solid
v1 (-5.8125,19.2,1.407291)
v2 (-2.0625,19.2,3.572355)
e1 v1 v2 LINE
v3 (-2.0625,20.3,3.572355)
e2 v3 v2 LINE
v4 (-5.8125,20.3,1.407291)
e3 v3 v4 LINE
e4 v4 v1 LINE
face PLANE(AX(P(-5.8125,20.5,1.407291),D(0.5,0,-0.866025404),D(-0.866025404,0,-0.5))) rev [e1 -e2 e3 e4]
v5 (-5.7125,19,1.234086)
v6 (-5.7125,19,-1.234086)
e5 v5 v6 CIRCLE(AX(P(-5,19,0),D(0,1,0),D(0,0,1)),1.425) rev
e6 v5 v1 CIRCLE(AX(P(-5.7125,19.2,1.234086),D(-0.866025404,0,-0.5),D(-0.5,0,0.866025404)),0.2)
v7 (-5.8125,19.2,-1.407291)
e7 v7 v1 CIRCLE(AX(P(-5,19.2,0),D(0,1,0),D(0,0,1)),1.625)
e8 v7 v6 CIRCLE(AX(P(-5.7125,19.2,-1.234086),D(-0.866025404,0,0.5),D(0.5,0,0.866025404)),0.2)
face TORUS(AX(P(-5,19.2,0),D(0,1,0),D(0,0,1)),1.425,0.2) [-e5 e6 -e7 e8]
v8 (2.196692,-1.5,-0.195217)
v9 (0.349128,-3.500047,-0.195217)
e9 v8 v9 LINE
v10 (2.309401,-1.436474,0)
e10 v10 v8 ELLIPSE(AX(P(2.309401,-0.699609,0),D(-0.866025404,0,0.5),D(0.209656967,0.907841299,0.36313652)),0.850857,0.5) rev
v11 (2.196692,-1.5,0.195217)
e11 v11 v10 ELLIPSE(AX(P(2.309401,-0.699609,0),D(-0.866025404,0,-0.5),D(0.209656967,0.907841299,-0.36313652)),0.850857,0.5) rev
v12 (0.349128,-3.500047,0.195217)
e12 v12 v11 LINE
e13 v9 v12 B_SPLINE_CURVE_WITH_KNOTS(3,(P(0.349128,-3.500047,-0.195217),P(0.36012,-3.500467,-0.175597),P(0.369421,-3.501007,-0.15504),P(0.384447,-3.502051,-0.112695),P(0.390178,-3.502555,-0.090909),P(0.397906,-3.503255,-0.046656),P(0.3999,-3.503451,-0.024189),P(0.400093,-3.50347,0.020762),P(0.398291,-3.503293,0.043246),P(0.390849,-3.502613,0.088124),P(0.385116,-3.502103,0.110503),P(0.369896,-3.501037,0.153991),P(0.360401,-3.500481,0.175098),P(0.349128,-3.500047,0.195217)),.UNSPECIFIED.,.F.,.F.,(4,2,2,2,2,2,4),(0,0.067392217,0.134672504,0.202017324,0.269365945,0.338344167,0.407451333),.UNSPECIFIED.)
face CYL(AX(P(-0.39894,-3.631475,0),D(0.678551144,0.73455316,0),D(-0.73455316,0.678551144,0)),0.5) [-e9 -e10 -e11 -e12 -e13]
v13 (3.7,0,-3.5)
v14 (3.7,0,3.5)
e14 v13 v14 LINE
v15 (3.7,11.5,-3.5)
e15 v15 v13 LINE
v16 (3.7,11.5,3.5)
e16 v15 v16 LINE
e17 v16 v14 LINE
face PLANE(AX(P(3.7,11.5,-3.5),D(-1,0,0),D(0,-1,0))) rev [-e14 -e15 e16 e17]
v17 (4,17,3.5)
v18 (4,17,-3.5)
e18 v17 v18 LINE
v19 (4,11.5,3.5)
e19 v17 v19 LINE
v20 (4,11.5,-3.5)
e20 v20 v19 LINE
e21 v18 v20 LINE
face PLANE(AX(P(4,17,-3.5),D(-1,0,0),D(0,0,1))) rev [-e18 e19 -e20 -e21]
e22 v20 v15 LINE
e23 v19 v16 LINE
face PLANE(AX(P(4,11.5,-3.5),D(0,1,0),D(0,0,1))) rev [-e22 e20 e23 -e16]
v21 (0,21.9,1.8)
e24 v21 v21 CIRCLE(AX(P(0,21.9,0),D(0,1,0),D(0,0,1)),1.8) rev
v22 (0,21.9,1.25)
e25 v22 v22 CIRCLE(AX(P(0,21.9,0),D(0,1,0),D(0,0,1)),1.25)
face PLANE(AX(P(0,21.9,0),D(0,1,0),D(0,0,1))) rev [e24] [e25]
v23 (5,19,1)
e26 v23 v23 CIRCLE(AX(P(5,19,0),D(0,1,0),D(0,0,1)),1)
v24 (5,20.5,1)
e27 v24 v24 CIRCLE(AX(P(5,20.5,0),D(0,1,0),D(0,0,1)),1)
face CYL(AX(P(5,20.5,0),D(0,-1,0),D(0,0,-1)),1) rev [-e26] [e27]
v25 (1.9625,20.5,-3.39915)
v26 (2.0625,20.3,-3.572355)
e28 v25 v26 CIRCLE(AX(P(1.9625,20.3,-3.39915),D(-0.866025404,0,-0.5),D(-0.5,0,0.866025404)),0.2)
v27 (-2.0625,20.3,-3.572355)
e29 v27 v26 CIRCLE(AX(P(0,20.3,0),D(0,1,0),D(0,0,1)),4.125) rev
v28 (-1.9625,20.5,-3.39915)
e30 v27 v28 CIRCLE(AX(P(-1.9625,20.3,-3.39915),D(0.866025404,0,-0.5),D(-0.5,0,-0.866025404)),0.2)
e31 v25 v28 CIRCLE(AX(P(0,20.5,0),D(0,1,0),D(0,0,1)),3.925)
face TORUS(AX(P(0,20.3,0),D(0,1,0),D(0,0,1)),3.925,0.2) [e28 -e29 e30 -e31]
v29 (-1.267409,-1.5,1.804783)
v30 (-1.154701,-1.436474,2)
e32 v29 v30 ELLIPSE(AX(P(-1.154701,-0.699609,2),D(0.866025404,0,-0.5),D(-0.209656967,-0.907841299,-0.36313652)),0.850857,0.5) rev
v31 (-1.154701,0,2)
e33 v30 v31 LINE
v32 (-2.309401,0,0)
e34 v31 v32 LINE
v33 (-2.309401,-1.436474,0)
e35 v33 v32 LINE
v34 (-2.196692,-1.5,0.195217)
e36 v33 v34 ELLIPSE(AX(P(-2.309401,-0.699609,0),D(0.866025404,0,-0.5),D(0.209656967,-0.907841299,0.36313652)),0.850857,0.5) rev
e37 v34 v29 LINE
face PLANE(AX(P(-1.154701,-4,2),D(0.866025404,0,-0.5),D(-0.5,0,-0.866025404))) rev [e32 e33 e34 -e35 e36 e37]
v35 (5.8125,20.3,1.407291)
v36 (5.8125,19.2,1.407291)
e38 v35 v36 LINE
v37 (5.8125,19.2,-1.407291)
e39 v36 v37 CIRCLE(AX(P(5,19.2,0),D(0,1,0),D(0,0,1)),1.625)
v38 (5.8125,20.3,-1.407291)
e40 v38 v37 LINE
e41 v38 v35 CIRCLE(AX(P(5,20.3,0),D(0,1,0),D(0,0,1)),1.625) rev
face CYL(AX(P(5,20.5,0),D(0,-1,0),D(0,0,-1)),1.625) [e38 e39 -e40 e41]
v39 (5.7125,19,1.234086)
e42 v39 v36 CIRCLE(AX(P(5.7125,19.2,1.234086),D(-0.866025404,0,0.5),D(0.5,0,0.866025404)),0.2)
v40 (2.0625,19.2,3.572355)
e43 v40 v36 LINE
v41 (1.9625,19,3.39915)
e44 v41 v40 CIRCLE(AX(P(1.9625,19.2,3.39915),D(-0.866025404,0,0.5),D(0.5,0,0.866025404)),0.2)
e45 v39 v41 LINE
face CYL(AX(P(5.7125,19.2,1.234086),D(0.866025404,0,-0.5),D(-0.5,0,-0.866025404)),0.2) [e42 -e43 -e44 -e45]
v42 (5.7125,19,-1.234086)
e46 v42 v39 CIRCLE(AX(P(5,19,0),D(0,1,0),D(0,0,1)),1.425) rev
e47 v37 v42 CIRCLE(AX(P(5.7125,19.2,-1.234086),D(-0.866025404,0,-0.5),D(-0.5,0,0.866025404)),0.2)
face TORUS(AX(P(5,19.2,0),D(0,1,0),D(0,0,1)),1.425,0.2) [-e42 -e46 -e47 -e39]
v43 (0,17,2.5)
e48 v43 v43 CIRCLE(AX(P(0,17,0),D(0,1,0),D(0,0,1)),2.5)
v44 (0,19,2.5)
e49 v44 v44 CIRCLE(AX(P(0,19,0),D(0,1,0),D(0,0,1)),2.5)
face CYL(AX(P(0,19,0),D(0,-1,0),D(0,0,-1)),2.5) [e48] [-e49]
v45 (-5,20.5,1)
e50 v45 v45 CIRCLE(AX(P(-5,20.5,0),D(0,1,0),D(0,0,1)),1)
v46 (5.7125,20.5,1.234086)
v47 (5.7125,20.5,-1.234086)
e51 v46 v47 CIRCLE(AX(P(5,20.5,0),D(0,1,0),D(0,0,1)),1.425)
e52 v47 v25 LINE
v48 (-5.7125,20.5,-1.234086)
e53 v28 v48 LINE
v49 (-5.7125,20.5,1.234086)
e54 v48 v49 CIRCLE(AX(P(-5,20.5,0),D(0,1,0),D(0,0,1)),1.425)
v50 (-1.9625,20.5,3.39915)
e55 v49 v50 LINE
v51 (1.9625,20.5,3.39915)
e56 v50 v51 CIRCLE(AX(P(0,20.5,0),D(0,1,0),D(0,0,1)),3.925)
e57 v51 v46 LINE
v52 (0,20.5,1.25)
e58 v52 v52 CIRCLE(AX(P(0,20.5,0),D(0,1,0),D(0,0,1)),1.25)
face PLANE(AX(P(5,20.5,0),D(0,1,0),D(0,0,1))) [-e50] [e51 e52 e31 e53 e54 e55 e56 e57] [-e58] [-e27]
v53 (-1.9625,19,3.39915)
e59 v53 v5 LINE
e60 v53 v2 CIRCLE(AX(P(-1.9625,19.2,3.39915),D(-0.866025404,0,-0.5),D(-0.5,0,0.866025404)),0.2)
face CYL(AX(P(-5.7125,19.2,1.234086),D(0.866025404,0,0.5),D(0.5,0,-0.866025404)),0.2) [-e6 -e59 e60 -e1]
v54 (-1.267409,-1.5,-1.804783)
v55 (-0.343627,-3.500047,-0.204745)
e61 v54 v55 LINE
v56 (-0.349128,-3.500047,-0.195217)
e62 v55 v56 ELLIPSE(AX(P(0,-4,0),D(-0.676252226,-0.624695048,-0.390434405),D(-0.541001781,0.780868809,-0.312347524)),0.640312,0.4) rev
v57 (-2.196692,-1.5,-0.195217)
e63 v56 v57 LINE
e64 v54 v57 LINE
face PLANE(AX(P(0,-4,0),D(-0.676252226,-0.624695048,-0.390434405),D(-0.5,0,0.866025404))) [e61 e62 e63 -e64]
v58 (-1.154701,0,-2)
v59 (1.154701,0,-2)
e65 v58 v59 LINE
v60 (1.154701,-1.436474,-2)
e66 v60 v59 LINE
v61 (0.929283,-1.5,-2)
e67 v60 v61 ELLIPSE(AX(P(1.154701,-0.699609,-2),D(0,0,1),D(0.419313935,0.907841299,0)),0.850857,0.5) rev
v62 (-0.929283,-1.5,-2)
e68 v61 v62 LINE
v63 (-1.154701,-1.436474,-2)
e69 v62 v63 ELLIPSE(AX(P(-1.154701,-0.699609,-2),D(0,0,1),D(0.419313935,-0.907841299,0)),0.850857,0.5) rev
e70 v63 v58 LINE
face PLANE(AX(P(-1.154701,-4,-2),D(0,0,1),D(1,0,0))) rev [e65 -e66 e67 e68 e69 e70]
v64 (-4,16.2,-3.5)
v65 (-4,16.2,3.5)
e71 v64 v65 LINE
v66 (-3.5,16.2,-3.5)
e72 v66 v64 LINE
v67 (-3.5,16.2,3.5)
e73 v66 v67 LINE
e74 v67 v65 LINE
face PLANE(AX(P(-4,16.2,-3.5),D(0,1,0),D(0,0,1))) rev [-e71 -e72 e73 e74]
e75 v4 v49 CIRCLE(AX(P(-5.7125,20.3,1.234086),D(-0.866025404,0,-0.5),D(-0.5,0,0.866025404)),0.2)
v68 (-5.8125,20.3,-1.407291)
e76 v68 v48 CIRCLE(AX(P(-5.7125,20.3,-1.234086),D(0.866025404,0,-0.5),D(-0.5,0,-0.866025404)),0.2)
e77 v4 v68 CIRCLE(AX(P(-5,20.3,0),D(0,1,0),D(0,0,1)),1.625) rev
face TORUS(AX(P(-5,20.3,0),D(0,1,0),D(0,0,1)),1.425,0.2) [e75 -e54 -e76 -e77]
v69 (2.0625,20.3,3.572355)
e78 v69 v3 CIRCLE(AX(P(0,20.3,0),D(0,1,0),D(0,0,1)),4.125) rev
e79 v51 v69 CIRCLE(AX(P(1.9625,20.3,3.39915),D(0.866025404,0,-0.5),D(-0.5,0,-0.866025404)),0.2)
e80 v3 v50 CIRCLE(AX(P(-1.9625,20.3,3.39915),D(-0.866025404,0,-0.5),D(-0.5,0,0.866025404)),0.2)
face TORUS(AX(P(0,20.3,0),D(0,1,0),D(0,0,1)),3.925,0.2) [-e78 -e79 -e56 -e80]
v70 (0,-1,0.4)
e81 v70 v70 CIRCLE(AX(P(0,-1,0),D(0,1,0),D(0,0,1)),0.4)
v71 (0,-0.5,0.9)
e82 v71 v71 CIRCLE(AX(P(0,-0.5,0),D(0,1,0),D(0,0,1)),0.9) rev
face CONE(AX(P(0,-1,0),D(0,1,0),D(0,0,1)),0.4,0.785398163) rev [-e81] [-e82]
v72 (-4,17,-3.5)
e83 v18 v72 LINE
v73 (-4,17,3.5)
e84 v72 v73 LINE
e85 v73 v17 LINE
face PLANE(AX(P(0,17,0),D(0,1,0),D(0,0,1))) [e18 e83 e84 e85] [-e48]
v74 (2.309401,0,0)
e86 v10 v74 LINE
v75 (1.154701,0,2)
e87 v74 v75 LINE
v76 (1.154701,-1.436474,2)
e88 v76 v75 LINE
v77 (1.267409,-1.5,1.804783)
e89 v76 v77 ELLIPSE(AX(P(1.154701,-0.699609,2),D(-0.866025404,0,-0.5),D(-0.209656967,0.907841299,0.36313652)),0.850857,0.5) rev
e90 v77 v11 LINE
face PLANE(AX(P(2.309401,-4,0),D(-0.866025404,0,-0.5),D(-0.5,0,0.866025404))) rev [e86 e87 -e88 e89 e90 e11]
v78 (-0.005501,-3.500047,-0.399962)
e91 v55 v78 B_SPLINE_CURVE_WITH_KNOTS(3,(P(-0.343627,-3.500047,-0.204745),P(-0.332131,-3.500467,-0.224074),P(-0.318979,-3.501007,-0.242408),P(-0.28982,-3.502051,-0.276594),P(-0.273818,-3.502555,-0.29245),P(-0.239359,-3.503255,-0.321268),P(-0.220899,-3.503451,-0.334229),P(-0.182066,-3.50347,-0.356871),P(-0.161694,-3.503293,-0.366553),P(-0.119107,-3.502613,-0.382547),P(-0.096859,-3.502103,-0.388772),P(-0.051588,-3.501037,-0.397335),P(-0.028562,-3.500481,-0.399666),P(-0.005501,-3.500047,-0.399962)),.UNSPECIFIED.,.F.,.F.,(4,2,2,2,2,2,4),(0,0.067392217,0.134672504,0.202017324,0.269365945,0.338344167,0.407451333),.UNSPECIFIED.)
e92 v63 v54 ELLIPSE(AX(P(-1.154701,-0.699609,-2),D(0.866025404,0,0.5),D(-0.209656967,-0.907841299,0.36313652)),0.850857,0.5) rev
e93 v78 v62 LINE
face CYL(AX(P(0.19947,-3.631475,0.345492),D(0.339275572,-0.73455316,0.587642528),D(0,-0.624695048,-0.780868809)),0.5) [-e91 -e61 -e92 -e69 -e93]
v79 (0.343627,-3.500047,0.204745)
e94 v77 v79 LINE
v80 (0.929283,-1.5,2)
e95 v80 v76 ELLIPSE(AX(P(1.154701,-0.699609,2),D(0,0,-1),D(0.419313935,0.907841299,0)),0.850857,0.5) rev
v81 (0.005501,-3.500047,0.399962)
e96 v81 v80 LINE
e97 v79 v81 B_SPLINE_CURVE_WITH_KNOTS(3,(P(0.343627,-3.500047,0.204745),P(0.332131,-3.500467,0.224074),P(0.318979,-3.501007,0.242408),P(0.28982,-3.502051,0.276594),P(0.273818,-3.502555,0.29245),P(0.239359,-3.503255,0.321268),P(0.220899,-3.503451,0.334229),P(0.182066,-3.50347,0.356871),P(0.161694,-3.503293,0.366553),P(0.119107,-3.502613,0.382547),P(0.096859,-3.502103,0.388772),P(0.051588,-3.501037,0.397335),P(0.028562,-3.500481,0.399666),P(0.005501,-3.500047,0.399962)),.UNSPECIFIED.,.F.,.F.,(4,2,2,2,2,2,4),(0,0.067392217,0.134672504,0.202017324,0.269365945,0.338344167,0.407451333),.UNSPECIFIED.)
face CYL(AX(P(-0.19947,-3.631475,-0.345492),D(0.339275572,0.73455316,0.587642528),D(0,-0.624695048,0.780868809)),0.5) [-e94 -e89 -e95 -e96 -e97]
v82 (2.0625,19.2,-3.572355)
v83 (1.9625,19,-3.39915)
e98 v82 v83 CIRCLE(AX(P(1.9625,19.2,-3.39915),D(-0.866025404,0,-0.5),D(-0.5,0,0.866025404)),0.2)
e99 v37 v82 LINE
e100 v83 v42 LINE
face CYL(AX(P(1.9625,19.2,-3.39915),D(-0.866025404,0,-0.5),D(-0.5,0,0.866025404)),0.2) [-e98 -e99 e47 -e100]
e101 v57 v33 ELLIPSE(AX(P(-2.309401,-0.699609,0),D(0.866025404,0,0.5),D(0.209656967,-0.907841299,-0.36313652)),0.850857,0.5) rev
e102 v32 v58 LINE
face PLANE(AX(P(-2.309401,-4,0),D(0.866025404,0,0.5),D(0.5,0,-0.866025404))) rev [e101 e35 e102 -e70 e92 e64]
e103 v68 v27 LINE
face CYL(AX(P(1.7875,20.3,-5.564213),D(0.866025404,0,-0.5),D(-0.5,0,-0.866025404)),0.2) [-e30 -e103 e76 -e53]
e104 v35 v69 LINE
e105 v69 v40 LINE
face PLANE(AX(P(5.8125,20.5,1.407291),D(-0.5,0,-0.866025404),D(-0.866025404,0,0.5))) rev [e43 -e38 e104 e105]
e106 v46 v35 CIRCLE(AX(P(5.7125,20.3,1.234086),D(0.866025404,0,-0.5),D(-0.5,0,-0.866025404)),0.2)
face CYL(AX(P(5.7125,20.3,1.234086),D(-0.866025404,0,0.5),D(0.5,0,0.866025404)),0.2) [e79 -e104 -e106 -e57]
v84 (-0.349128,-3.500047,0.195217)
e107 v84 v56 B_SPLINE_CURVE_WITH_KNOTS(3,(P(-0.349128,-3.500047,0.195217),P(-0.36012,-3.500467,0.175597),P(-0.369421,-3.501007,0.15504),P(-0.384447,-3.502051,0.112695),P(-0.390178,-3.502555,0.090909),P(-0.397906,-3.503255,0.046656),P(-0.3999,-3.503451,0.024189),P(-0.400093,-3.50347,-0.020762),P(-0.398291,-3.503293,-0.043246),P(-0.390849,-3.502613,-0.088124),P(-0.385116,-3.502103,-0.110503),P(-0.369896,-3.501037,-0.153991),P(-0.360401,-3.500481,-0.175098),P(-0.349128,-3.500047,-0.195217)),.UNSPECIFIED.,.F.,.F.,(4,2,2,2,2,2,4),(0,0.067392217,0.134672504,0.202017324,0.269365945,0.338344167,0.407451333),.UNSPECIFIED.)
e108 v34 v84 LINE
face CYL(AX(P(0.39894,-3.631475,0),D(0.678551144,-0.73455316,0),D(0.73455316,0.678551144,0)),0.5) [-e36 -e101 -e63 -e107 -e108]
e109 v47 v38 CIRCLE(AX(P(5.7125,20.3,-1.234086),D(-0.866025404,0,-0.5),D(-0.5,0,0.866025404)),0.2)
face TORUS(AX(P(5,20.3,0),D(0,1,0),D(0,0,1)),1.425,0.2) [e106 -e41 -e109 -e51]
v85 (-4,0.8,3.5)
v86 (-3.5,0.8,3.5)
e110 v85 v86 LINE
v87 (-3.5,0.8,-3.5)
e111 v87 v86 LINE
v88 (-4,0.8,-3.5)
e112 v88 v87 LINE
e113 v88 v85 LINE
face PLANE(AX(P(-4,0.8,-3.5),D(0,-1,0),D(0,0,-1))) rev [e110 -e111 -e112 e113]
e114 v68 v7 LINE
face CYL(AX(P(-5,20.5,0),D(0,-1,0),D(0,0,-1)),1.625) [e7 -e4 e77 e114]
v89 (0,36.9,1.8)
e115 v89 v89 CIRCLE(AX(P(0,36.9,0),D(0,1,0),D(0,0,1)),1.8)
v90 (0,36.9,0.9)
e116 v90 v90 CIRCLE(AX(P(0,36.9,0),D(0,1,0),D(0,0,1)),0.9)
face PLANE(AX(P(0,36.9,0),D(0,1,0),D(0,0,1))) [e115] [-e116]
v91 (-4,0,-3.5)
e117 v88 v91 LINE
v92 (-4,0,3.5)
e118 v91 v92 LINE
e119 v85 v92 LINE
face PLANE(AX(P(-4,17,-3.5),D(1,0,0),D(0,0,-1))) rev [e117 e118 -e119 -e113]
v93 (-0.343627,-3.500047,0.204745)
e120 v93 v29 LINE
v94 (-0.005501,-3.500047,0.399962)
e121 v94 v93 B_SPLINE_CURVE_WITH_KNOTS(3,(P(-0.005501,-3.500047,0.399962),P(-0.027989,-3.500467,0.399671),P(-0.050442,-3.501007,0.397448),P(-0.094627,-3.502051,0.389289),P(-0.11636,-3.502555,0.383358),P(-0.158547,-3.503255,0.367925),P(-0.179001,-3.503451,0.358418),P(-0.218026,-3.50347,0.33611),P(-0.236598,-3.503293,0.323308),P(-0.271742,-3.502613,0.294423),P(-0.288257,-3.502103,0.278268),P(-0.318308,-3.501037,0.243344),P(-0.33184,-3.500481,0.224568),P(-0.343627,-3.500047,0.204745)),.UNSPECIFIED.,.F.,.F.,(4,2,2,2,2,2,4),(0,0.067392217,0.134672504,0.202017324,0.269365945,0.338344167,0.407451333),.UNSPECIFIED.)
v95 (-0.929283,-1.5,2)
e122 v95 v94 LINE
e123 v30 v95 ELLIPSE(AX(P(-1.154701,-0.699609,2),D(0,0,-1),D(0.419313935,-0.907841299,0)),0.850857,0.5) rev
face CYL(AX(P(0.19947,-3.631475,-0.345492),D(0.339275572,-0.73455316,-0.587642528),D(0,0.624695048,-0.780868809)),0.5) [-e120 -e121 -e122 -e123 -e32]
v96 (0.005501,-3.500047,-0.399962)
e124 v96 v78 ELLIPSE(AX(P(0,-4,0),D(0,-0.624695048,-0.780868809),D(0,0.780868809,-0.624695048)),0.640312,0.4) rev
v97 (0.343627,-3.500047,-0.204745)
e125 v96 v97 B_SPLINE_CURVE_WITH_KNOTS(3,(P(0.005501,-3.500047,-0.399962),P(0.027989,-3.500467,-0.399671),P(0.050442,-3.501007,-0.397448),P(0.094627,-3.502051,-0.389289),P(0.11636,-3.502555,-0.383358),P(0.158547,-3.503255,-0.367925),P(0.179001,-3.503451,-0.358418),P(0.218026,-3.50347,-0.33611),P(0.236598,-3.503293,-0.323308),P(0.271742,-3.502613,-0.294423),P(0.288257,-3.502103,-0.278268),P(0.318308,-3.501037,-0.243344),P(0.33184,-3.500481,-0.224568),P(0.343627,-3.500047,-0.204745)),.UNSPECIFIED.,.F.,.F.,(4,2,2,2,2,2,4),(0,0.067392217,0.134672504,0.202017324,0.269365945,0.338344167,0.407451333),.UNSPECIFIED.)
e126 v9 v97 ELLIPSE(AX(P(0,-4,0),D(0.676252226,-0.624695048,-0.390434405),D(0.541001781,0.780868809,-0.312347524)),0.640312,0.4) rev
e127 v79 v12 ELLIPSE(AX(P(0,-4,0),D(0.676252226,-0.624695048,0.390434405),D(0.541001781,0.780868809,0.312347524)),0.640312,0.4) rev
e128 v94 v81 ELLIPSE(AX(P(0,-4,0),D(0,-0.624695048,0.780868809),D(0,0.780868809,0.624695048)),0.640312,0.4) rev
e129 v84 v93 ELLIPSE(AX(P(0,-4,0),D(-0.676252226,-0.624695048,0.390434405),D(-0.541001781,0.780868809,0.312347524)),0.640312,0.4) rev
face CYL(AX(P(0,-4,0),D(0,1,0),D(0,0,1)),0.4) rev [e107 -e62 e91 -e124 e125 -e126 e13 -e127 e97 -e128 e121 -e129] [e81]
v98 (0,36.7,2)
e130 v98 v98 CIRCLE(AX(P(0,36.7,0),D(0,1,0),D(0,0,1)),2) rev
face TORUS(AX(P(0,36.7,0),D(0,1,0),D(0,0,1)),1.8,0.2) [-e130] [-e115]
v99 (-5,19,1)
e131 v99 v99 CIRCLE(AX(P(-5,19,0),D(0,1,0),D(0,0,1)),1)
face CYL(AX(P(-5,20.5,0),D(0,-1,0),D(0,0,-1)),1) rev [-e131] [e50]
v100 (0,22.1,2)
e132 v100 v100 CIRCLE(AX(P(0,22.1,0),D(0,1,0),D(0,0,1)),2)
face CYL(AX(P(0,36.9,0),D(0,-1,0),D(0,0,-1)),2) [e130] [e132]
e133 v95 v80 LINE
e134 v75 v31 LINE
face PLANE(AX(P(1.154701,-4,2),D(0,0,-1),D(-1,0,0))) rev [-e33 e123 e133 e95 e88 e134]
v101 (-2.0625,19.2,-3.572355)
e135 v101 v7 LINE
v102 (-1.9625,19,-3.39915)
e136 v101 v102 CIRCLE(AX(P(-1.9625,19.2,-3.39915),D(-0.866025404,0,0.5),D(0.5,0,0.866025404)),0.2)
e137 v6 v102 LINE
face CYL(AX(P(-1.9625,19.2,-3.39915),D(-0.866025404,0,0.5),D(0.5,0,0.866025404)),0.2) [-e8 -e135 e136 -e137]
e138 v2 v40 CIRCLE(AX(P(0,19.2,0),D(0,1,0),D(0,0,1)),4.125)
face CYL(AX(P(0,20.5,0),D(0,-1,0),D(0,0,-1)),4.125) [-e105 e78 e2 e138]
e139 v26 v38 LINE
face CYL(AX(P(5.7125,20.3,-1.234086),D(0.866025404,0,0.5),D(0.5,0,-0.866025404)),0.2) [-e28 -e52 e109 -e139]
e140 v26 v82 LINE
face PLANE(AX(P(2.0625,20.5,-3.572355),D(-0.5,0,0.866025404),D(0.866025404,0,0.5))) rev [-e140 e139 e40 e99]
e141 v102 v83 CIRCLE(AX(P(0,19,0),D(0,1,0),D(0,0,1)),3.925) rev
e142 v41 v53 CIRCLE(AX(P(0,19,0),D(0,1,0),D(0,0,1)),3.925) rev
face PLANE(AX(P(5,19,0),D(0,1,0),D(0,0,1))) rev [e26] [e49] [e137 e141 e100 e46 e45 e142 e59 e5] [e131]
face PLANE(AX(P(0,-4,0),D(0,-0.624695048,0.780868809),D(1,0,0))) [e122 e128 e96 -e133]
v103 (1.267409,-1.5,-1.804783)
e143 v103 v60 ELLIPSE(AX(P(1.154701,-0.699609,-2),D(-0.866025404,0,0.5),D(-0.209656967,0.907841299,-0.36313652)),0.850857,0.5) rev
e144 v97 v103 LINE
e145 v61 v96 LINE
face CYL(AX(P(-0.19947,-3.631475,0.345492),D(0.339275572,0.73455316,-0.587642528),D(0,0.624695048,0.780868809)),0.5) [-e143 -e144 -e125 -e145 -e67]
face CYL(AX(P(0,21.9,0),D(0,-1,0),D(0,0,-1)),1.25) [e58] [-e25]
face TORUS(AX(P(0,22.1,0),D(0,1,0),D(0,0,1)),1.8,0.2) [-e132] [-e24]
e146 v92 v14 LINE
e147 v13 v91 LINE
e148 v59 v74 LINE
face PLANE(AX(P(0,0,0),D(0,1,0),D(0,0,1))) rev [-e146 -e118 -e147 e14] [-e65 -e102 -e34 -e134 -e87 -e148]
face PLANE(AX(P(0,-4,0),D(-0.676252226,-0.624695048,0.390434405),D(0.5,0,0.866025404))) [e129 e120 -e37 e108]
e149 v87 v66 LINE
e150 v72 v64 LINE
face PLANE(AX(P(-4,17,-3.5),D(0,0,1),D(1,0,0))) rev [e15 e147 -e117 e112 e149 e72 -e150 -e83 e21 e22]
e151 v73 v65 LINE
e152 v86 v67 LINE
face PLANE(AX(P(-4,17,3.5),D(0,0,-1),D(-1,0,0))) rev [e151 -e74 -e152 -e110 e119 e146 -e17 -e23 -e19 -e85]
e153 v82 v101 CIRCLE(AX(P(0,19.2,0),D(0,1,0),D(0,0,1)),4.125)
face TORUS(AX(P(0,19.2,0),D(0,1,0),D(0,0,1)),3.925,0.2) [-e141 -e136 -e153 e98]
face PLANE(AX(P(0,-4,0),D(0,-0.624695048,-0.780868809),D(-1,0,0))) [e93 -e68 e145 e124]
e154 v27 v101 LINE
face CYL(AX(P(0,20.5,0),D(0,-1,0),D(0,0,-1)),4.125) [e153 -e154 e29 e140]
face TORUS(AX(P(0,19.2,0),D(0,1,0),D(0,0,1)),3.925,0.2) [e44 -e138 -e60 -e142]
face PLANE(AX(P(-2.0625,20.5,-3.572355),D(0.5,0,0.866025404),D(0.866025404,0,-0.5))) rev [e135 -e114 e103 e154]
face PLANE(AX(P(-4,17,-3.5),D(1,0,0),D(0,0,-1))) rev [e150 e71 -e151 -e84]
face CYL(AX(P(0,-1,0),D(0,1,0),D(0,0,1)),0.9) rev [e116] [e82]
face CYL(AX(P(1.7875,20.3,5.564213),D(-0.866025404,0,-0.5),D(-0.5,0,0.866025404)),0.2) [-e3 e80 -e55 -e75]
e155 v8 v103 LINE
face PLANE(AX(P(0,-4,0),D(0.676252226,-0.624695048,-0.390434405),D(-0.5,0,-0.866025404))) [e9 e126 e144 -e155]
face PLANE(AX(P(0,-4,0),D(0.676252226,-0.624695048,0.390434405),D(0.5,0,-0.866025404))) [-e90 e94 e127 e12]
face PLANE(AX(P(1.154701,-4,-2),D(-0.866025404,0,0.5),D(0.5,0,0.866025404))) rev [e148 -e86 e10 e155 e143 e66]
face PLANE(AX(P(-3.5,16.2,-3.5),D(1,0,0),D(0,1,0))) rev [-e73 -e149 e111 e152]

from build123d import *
from OCP.BRepFilletAPI import BRepFilletAPI_MakeChamfer

# Parameters (mm, degrees)
SKETCH1_W           = 8
SKETCH1_H           = 7
BOSS_EXTRUDE1_DEPTH = 17
BOSS_EXTRUDE2_DEPTH = 4
CHAMFER1_SIZE       = 2.5
CHAMFER1_SIZE_2     = 2
SKETCH3_R           = 0.4
CUT_EXTRUDE1_DEPTH  = 18.811513131
FILLET2_R           = 0.5
SKETCH4_W           = 0.5
SKETCH4_H           = 15.4
CUT_EXTRUDE2_DEPTH  = 19.814887722
SKETCH5_W           = 0.3
SKETCH5_H           = 11.5
CUT_EXTRUDE3_DEPTH  = 19.814887722
SKETCH6_R           = 0.9
CUT_EXTRUDE4_DEPTH  = 18
CHAMFER2_SIZE       = 0.5
BOSS_EXTRUDE3_START = 2
SKETCH7_R           = 2.5
SKETCH7_R_2         = 0.9
BOSS_EXTRUDE3_DEPTH = 2
BOSS_EXTRUDE4_START = 1.5
SKETCH8_R           = 0.9
SKETCH8_R_2         = 1
BOSS_EXTRUDE4_DEPTH = 1.5
BOSS_EXTRUDE5_START = 1.4
SKETCH9_R           = 1.25
SKETCH9_R_2         = 0.9
BOSS_EXTRUDE5_DEPTH = 1.4
BOSS_EXTRUDE6_START = 15
SKETCH10_R          = 2
SKETCH10_R_2        = 0.9
BOSS_EXTRUDE6_DEPTH = 15
FILLET3_R           = 0.2


# Some blends are built 0.0001 mm under size
with BuildPart() as part:
    # Sketch1 → Boss-Extrude1 (new body)
    with BuildSketch(Plane(origin=(0, 0, 0), x_dir=(1, 0, 0), z_dir=(0, 1, 0))):
        Rectangle(SKETCH1_W, SKETCH1_H)
    extrude(amount=BOSS_EXTRUDE1_DEPTH)

    # Sketch2 → Boss-Extrude2 (add)
    with BuildSketch(Plane(origin=(0, 0, 0), x_dir=(-1, 0, 0), z_dir=(0, -1, 0))):
        Polygon((-2.309401077, 0), (-1.154700538, -2), (1.154700538, -2), (2.309401077, 0), (1.154700538, 2), (-1.154700538, 2), align=None)
    extrude(amount=BOSS_EXTRUDE2_DEPTH)

    # Chamfer1
    chamfer1_edges_1 = [part.edges().sort_by_distance(p)[0] for p in [
        (1.732050808, -4, -1),
    ]]
    chamfer1_side_1 = [part.faces().sort_by_distance(p)[0] for p in [
        (1.732050808, -3.96, -1),
    ]]
    chamfer1_edges_2 = [part.edges().sort_by_distance(p)[0] for p in [
        (1.732050808, -4, 1),
    ]]
    chamfer1_side_2 = [part.faces().sort_by_distance(p)[0] for p in [
        (1.732050808, -3.96, 1),
    ]]
    chamfer1_edges_3 = [part.edges().sort_by_distance(p)[0] for p in [
        (0, -4, 2),
    ]]
    chamfer1_side_3 = [part.faces().sort_by_distance(p)[0] for p in [
        (0, -3.96, 2),
    ]]
    chamfer1_edges_4 = [part.edges().sort_by_distance(p)[0] for p in [
        (-1.732050808, -4, 1),
    ]]
    chamfer1_side_4 = [part.faces().sort_by_distance(p)[0] for p in [
        (-1.732050808, -3.96, 1),
    ]]
    chamfer1_edges_5 = [part.edges().sort_by_distance(p)[0] for p in [
        (-1.732050808, -4, -1),
    ]]
    chamfer1_side_5 = [part.faces().sort_by_distance(p)[0] for p in [
        (-1.732050808, -3.96, -1),
    ]]
    chamfer1_edges_6 = [part.edges().sort_by_distance(p)[0] for p in [
        (0, -4, -2),
    ]]
    chamfer1_side_6 = [part.faces().sort_by_distance(p)[0] for p in [
        (0, -3.96, -2),
    ]]
    chamfer1 = BRepFilletAPI_MakeChamfer(part.part.solid().wrapped)
    for e in chamfer1_edges_1:
        chamfer1.Add(CHAMFER1_SIZE - 0.0001, CHAMFER1_SIZE_2 - 0.0001, e.wrapped, chamfer1_side_1[0].wrapped)
    for e in chamfer1_edges_2:
        chamfer1.Add(CHAMFER1_SIZE - 0.0001, CHAMFER1_SIZE_2 - 0.0001, e.wrapped, chamfer1_side_2[0].wrapped)
    for e in chamfer1_edges_3:
        chamfer1.Add(CHAMFER1_SIZE - 0.0001, CHAMFER1_SIZE_2 - 0.0001, e.wrapped, chamfer1_side_3[0].wrapped)
    for e in chamfer1_edges_4:
        chamfer1.Add(CHAMFER1_SIZE - 0.0001, CHAMFER1_SIZE_2 - 0.0001, e.wrapped, chamfer1_side_4[0].wrapped)
    for e in chamfer1_edges_5:
        chamfer1.Add(CHAMFER1_SIZE - 0.0001, CHAMFER1_SIZE_2 - 0.0001, e.wrapped, chamfer1_side_5[0].wrapped)
    for e in chamfer1_edges_6:
        chamfer1.Add(CHAMFER1_SIZE - 0.0001, CHAMFER1_SIZE_2 - 0.0001, e.wrapped, chamfer1_side_6[0].wrapped)
    add(Compound.cast(chamfer1.Shape()), mode=Mode.REPLACE)  # a hair under: the kernel refuses the full size

    # Sketch3 → Cut-Extrude1 (cut, through all)
    with BuildSketch(Plane(origin=(0, 0, 0), x_dir=(-1, 0, 0), z_dir=(0, -1, 0))):
        with Locations(Location((0, 0, 0), (0, 0, 300))):
            Circle(SKETCH3_R)
    extrude(amount=CUT_EXTRUDE1_DEPTH, mode=Mode.SUBTRACT)

    # Fillet2
    # the kernel refuses this fillet: 0.5 mm, written as the material it takes off along each edge
    with BuildSketch(Plane(origin=(1.334556511, -1.110696502, -2.311519683), x_dir=(0.65389042348858, 0.264929316245572, 0.7086887691106577), z_dir=(-0.3392737411625274, -0.7345565425685966, 0.5876393573674692)), Plane(origin=(-1.334556511, -1.110696502, -2.311519683), x_dir=(0.940687689170844, 0.2649293162455729, -0.2119413334771459), z_dir=(0.33927374116252723, -0.7345565425685966, 0.5876393573674691)), Plane(origin=(2.669113022, -1.110696502, 0), x_dir=(-0.2867972656822634, 0.26492931624557164, 0.9206301025878043), z_dir=(-0.6785474823250541, -0.7345565425685965, 0)), Plane(origin=(-2.669113022, -1.110696502, 0), x_dir=(0.2867972656822621, 0.2649293162455703, -0.9206301025878052), z_dir=(0.6785474823250541, -0.7345565425685966, 0))) as fillet2_piece_1:
        with BuildLine():
            CenterArc((FILLET2_R * 0.424096417587, FILLET2_R), FILLET2_R, 224.036746285, 45.963253715)
            Line((-FILLET2_R * 0.294797720102, FILLET2_R * 0.304880428418), (0, 0))
            Line((0, 0), (FILLET2_R * 0.424096417587, 0))
        make_face()
    extrude(amount=3.874194565, mode=Mode.SUBTRACT)
    with BuildSketch(Plane(origin=(1.334556511, -1.110696502, 2.311519683), x_dir=(0.6538904234885794, 0.26492931624557287, -0.708688769110658), z_dir=(-0.33927374116252706, -0.7345565425685967, -0.5876393573674692)), Plane(origin=(-1.334556511, -1.110696502, 2.311519683), x_dir=(0.9406876891708441, 0.2649293162455719, 0.2119413334771472), z_dir=(0.33927374116252734, -0.7345565425685966, -0.5876393573674692))) as fillet2_piece_2:
        with BuildLine():
            CenterArc((FILLET2_R * 0.424096417587, -FILLET2_R), FILLET2_R, 90, 45.963253715)
            Line((-FILLET2_R * 0.294797720102, -FILLET2_R * 0.304880428418), (0, 0))
            Line((0, 0), (FILLET2_R * 0.424096417587, 0))
        make_face()
    extrude(amount=3.874194565, mode=Mode.SUBTRACT)

    # Sketch4 → Cut-Extrude2 (cut, through all)
    with BuildSketch(Plane.XY.offset(3.5)):
        with Locations((-3.75, 8.5)):
            Rectangle(SKETCH4_W, SKETCH4_H)
    extrude(amount=-CUT_EXTRUDE2_DEPTH, mode=Mode.SUBTRACT)

    # Sketch5 → Cut-Extrude3 (cut, through all)
    with BuildSketch(Plane.XY.offset(3.5)):
        with Locations((3.85, 5.75)):
            Rectangle(SKETCH5_W, SKETCH5_H)
    extrude(amount=-CUT_EXTRUDE3_DEPTH, mode=Mode.SUBTRACT)

    # Sketch6 → Cut-Extrude4 (cut)
    with BuildSketch(Plane(origin=(0, 17, 0), x_dir=(1, 0, 0), z_dir=(0, 1, 0))):
        with Locations(Location((0, 0, 0), (0, 0, 270))):
            Circle(SKETCH6_R)
    extrude(amount=-CUT_EXTRUDE4_DEPTH, mode=Mode.SUBTRACT)

    # Chamfer2
    chamfer2_edges = [part.edges().sort_by_distance(p)[0] for p in [
        (0, -1, -0.9),
    ]]
    chamfer(chamfer2_edges, length=CHAMFER2_SIZE - 0.0001)  # a hair under: the kernel refuses the full size

    # Sketch7 → Boss-Extrude3 (add)
    with BuildSketch(Plane(origin=(0, 17, 0), x_dir=(1, 0, 0), z_dir=(0, 1, 0)).offset(BOSS_EXTRUDE3_START)):
        with Locations(Location((0, 0, 0), (0, 0, 270))):
            Circle(SKETCH7_R)
        with Locations(Location((0, 0, 0), (0, 0, 270))):
            Circle(SKETCH7_R_2, mode=Mode.SUBTRACT)
    extrude(amount=-BOSS_EXTRUDE3_DEPTH)

    # Sketch8 → Boss-Extrude4 (add)
    with BuildSketch(Plane(origin=(0, 19, 0), x_dir=(1, 0, 0), z_dir=(0, 1, 0)).offset(BOSS_EXTRUDE4_START)):
        with BuildLine():
            Line((2.0625, 3.572354791), (5.8125, 1.407291281))
            ThreePointArc((5.8125, 1.407291281), (6.625, 0), (5.8125, -1.407291281))
            Line((5.8125, -1.407291281), (2.0625, -3.572354791))
            ThreePointArc((2.0625, -3.572354791), (0, -4.125), (-2.0625, -3.572354791))
            Line((-2.0625, -3.572354791), (-5.8125, -1.407291281))
            ThreePointArc((-5.8125, -1.407291281), (-6.625, 0), (-5.8125, 1.407291281))
            Line((-5.8125, 1.407291281), (-2.0625, 3.572354791))
            ThreePointArc((-2.0625, 3.572354791), (0, 4.125), (2.0625, 3.572354791))
        make_face()
        with Locations(Location((0, 0, 0), (0, 0, 270))):
            Circle(SKETCH8_R, mode=Mode.SUBTRACT)
        with Locations(Location((5, 0, 0), (0, 0, 270))):
            Circle(SKETCH8_R_2, mode=Mode.SUBTRACT)
        with Locations(Location((-5, 0, 0), (0, 0, 270))):
            Circle(SKETCH8_R_2, mode=Mode.SUBTRACT)
    extrude(amount=-BOSS_EXTRUDE4_DEPTH)

    # Sketch9 → Boss-Extrude5 (add)
    with BuildSketch(Plane(origin=(0, 20.5, 0), x_dir=(1, 0, 0), z_dir=(0, 1, 0)).offset(BOSS_EXTRUDE5_START)):
        with Locations(Location((0, 0, 0), (0, 0, 270))):
            Circle(SKETCH9_R)
        with Locations(Location((0, 0, 0), (0, 0, 270))):
            Circle(SKETCH9_R_2, mode=Mode.SUBTRACT)
    extrude(amount=-BOSS_EXTRUDE5_DEPTH)

    # Sketch10 → Boss-Extrude6 (add)
    with BuildSketch(Plane(origin=(0, 21.9, 0), x_dir=(1, 0, 0), z_dir=(0, 1, 0)).offset(BOSS_EXTRUDE6_START)):
        with Locations(Location((0, 0, 0), (0, 0, 270))):
            Circle(SKETCH10_R)
        with Locations(Location((0, 0, 0), (0, 0, 270))):
            Circle(SKETCH10_R_2, mode=Mode.SUBTRACT)
    extrude(amount=-BOSS_EXTRUDE6_DEPTH)

    # Fillet3
    fillet3_edges = [part.edges().sort_by_distance(p)[0] for p in [
        (6.625, 20.5, 0),
        (3.9375, 20.5, -2.489823036),
        (0, 20.5, -4.125),
        (-3.9375, 20.5, -2.489823036),
        (-6.625, 20.5, 0),
        (-3.9375, 20.5, 2.489823036),
        (0, 20.5, 4.125),
        (3.9375, 20.5, 2.489823036),
        (6.625, 19, 0),
        (3.9375, 19, -2.489823036),
        (0, 19, -4.125),
        (-3.9375, 19, -2.489823036),
        (-6.625, 19, 0),
        (-3.9375, 19, 2.489823036),
        (0, 19, 4.125),
        (3.9375, 19, 2.489823036),
        (0, 36.9, -2),
        (0, 21.9, -2),
    ]]
    fillet(fillet3_edges, radius=FILLET3_R)


solid = part.part
